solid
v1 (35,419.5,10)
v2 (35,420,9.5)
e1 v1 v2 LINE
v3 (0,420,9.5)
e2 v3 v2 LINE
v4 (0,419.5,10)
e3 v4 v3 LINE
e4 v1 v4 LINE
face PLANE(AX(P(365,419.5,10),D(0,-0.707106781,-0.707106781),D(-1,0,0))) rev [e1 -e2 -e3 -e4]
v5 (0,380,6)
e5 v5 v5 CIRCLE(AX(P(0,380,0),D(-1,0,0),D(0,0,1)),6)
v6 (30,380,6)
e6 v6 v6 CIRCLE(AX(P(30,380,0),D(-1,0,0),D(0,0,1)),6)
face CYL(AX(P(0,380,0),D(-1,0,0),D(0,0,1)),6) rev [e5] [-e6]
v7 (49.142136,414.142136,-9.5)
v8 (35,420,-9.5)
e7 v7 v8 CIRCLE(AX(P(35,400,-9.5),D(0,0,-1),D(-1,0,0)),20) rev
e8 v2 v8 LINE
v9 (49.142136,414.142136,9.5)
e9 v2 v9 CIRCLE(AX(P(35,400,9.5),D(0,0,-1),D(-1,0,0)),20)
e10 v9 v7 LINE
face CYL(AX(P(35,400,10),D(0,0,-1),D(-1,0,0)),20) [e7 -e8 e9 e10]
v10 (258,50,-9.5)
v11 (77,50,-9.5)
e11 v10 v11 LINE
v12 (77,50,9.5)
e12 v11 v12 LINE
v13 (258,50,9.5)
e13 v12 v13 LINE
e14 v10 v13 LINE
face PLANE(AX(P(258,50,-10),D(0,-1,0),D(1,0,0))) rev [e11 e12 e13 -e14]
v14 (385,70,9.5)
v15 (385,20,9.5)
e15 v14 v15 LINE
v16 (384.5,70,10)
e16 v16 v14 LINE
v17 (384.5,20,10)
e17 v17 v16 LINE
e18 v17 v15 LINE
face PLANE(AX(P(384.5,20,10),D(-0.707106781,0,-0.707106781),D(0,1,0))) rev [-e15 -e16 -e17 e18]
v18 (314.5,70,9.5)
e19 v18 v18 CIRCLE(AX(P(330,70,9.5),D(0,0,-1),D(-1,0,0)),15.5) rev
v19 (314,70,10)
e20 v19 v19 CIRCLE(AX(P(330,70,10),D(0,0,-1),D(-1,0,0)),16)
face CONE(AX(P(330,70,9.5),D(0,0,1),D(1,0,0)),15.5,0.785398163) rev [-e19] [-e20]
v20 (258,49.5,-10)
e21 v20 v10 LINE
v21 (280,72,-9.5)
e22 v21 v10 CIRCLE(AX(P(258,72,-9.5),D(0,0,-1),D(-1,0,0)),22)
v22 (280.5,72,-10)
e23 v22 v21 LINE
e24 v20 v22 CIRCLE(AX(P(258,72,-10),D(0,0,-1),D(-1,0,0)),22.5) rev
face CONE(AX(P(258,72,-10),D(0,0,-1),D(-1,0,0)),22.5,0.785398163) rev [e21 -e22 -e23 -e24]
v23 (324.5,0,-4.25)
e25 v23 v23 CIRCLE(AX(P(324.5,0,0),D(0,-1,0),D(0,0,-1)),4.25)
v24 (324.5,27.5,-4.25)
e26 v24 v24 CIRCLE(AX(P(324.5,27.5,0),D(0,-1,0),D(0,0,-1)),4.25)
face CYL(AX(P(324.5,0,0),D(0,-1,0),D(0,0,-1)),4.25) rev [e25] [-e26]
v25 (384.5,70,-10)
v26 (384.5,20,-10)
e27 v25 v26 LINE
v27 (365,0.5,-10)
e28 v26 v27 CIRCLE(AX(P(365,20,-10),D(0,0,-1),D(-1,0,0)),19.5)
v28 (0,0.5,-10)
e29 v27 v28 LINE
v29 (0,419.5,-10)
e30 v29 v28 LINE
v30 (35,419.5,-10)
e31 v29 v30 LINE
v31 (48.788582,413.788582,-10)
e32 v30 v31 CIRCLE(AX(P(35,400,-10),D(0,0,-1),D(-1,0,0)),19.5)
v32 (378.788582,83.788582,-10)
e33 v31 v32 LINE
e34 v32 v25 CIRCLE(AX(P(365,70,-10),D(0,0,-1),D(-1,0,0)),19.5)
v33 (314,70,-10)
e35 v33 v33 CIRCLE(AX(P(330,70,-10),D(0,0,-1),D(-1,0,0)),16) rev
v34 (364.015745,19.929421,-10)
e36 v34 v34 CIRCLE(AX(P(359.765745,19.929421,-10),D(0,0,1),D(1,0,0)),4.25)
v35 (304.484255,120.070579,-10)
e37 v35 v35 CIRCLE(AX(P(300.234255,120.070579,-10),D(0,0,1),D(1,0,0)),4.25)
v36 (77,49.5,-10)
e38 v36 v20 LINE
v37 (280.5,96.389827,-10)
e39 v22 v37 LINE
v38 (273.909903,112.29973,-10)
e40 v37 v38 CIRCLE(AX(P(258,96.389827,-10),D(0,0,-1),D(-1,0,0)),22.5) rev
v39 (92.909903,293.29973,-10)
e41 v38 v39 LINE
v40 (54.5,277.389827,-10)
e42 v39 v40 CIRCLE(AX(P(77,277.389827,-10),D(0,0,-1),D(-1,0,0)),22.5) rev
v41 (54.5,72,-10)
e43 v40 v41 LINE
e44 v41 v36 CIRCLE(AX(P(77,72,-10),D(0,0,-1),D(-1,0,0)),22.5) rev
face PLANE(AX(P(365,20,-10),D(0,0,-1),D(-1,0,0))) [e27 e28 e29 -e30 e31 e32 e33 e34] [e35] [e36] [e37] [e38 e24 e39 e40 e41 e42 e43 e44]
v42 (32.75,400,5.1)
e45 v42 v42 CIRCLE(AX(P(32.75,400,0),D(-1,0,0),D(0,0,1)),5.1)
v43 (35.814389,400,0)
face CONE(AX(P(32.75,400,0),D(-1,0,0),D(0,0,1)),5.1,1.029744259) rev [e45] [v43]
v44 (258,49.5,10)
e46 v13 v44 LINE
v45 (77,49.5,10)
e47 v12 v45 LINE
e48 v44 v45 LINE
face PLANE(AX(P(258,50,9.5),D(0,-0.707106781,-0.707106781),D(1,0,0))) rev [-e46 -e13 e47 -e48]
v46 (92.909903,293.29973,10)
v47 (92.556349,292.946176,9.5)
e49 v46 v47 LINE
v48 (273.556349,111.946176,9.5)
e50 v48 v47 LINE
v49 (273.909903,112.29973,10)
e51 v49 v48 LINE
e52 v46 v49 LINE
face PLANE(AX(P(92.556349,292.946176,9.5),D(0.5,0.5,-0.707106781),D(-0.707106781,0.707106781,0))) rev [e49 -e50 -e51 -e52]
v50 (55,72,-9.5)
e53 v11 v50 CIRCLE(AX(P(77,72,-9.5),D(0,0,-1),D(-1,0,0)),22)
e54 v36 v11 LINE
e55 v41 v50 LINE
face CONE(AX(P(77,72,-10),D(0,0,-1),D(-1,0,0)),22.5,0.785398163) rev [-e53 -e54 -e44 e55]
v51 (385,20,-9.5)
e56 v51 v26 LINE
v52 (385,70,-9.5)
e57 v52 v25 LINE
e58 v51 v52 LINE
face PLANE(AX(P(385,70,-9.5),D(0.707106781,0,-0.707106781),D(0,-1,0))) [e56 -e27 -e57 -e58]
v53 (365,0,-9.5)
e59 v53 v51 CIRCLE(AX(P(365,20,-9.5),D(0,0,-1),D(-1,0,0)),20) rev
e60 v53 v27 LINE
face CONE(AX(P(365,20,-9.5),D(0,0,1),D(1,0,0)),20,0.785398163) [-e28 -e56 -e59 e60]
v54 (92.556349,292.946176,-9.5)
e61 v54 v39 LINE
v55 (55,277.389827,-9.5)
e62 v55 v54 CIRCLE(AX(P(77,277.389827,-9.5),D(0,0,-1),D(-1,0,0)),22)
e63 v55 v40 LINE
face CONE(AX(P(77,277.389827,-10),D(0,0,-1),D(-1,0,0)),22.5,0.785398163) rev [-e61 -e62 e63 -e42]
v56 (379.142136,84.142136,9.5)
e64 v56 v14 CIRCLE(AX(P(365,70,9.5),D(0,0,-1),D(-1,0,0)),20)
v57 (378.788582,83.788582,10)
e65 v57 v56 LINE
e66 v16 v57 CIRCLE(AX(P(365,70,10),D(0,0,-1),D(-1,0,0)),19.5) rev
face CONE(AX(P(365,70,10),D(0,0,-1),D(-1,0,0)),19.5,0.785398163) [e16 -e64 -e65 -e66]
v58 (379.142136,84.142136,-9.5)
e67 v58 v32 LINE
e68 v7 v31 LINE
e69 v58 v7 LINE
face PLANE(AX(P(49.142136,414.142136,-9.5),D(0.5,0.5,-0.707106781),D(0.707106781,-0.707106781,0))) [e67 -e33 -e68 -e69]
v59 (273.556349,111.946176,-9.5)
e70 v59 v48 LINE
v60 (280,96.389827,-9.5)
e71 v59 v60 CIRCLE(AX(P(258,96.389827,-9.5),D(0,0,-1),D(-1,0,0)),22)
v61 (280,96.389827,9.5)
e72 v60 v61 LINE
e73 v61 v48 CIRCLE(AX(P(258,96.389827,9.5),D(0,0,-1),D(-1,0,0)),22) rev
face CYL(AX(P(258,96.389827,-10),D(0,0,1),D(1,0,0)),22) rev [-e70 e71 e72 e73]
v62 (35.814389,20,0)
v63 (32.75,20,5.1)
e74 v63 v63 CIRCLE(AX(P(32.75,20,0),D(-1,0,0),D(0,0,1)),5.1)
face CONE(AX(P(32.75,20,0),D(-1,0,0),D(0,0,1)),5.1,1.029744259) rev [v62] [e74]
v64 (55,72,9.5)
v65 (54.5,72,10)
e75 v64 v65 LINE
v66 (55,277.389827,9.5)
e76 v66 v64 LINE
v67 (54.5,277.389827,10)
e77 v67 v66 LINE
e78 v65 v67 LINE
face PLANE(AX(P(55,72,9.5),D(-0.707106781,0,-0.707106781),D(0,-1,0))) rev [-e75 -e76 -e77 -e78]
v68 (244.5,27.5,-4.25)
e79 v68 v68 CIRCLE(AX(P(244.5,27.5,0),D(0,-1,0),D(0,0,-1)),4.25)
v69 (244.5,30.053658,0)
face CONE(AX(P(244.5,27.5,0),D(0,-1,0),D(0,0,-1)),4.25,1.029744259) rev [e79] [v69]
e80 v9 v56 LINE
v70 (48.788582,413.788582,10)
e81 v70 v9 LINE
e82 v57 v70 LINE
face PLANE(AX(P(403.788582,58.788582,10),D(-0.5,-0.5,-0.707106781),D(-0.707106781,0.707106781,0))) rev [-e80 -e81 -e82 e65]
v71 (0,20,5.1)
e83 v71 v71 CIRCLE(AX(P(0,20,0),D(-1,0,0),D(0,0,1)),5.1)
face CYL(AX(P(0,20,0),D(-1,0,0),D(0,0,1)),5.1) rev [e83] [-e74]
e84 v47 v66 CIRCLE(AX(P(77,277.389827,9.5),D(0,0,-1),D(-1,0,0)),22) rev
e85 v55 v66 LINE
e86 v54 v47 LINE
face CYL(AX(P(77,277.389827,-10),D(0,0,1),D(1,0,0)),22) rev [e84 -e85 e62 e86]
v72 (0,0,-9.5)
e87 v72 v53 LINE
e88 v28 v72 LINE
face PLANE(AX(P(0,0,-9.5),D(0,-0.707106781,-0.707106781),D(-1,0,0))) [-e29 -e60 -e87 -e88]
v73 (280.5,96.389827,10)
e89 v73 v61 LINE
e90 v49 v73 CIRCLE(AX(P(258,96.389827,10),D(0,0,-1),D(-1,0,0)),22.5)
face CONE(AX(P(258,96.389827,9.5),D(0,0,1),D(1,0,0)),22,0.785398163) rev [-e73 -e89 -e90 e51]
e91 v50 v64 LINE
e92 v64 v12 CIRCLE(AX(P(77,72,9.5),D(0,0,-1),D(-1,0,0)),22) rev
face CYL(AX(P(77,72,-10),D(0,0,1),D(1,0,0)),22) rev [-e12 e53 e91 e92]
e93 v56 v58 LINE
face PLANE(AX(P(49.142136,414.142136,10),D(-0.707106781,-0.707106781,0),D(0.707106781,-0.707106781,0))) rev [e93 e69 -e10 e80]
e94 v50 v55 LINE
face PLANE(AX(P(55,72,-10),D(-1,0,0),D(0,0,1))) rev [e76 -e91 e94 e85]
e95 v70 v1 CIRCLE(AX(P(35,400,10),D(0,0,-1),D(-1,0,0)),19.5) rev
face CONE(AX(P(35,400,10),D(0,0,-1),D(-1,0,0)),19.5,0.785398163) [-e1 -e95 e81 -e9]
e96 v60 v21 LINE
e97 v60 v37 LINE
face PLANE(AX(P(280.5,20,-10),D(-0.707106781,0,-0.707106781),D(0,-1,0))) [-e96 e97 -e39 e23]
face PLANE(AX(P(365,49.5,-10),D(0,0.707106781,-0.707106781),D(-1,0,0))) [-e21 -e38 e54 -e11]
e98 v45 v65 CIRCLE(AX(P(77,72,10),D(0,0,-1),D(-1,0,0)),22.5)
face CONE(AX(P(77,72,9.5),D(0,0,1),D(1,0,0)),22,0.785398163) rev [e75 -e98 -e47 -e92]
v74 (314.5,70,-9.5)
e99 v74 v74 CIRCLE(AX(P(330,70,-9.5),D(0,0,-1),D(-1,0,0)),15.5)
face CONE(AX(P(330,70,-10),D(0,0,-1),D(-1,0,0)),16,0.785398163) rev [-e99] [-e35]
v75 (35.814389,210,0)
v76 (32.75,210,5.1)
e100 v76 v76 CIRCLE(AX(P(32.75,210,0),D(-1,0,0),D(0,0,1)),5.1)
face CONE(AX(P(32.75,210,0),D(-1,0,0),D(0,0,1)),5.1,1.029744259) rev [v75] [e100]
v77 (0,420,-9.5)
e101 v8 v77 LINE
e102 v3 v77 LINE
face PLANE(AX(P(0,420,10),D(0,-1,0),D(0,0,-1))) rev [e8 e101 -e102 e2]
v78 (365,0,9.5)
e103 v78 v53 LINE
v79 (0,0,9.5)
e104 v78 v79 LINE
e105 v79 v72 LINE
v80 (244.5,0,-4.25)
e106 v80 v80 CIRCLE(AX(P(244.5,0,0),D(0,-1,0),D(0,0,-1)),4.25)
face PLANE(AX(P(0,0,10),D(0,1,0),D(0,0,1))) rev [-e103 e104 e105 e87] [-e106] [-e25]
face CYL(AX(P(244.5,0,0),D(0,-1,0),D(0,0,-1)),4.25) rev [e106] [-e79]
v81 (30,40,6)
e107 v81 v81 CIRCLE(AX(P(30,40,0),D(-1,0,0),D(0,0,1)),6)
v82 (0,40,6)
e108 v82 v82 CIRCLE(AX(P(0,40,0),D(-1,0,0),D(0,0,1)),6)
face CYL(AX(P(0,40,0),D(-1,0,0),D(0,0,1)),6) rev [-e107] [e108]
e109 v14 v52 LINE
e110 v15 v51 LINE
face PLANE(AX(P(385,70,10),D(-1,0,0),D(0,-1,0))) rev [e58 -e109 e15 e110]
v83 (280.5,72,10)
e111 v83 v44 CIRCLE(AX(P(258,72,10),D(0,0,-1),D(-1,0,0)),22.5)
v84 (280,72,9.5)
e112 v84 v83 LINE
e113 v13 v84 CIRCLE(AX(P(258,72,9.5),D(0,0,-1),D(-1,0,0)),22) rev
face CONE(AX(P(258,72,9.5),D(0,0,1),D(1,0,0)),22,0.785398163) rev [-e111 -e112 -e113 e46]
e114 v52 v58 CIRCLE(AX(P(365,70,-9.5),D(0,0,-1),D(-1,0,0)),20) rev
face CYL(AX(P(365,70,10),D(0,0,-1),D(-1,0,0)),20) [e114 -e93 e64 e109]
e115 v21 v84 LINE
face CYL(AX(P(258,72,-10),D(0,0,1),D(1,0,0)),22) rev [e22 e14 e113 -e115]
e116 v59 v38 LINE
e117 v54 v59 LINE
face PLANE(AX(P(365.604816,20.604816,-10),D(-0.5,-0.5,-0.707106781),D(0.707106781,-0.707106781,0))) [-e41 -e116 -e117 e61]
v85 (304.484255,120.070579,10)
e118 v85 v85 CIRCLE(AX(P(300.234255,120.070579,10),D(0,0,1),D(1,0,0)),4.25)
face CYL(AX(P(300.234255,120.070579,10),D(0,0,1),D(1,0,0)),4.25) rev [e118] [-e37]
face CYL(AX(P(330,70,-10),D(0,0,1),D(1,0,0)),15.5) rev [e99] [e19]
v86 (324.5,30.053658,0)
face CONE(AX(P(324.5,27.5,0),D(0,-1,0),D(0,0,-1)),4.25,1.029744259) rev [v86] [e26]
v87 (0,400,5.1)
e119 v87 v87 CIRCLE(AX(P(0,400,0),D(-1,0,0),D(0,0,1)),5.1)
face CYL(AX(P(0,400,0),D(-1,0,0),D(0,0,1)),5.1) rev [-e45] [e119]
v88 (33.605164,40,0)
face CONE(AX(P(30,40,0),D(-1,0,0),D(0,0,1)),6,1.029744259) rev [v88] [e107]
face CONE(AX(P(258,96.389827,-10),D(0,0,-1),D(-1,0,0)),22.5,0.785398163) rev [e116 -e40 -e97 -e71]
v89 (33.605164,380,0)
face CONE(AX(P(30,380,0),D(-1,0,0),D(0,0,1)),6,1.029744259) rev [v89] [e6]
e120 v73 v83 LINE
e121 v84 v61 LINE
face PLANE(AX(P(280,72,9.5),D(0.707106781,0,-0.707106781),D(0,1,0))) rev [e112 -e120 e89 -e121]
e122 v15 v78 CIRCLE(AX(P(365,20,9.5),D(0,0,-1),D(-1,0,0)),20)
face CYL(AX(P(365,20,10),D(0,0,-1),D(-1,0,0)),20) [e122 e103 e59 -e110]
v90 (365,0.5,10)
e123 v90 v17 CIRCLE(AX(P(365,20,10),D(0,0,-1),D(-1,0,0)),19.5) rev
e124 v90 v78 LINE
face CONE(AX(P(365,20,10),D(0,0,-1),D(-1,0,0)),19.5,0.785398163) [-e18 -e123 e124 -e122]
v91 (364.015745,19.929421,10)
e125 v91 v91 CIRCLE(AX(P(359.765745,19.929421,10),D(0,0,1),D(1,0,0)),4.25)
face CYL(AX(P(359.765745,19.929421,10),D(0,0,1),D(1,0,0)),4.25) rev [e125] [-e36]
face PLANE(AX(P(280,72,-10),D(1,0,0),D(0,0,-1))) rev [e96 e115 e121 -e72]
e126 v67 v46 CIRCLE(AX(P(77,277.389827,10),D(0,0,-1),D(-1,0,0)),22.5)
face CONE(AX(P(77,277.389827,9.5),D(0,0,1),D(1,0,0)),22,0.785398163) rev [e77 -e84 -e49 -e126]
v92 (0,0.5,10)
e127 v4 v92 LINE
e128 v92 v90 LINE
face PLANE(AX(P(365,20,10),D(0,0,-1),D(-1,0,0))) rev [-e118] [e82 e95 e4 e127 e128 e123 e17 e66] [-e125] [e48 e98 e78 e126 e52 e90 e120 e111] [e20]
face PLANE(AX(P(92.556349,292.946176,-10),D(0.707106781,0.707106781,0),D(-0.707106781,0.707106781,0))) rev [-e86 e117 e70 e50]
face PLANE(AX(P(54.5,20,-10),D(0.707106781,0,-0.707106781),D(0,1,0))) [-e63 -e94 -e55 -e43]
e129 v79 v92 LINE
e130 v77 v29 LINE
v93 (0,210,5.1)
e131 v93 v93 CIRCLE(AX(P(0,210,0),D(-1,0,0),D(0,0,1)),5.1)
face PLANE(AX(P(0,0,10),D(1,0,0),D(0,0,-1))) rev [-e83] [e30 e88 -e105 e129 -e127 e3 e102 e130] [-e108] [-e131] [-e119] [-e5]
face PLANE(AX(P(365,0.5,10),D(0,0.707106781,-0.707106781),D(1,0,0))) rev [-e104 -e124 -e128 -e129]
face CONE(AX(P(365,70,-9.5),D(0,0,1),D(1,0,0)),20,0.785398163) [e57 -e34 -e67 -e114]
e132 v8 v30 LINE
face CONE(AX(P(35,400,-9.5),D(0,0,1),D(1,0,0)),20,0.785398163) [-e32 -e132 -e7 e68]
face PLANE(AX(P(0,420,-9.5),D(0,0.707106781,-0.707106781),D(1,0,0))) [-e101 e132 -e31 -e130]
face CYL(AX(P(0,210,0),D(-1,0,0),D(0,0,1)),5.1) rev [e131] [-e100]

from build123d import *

# Parameters (mm, degrees)
AUFSATZ_LINEAR_AUSTRAGEN1_DEPTH      = 10
F_12_0_12_DURCHMESSER_BOHRUNG1_D     = 12
F_12_0_12_DURCHMESSER_BOHRUNG1_DEPTH = 30
F_12_0_12_DURCHMESSER_BOHRUNG1_TIP   = 3.605163714
M12_GEWINDEBOHRUNG1_D                = 10.2
M12_GEWINDEBOHRUNG1_DEPTH            = 32.75
M12_GEWINDEBOHRUNG1_TIP              = 3.064389157
SCHNITT_LINEAR_START                 = -10
SCHNITT_LINEAR_AUSTRAGEN1_OUTLINE_R  = 15.5
SCHNITT_LINEAR_AUSTRAGEN1_DEPTH      = 20
M10_START                            = -10
M10_GEWINDEBOHRUNG1_OUTLINE_R        = 4.25
M10_GEWINDEBOHRUNG1_DEPTH            = 20
M10_GEWINDEBOHRUNG2_D                = 8.5
M10_GEWINDEBOHRUNG2_DEPTH            = 27.5
M10_GEWINDEBOHRUNG2_TIP              = 2.553657631
FASE1_SIZE                           = 0.5


# Read off the part's stored shape, not the designer's step: Schnitt-Linear austragen1, M10 Gewindebohrung1
with BuildPart() as part:
    # Skizze1 → Aufsatz-Linear austragen1 (new, symmetric)
    with BuildSketch(Plane.XY):
        with BuildLine():
            Line((0, 0), (0, 420))
            Line((0, 420), (35, 420))
            ThreePointArc((35, 420), (42.653668647, 418.47759065), (49.142135624, 414.142135624))
            Line((49.142135624, 414.142135624), (379.142135624, 84.142135624))
            ThreePointArc((379.142135624, 84.142135624), (383.47759065, 77.653668647), (385, 70))
            Line((385, 70), (385, 20))
            ThreePointArc((385, 20), (379.142135624, 5.857864376), (365, 0))
            Line((365, 0), (0, 0))
        make_face()
    extrude(amount=AUFSATZ_LINEAR_AUSTRAGEN1_DEPTH, both=True)

    # Ø12.0 (12) Durchmesser Bohrung1
    with Locations(Plane.ZY):
        with Locations((0, 40), (0, 380)):
            Hole(F_12_0_12_DURCHMESSER_BOHRUNG1_D / 2, depth=F_12_0_12_DURCHMESSER_BOHRUNG1_DEPTH)
            with Locations((0, 0, -(F_12_0_12_DURCHMESSER_BOHRUNG1_DEPTH + F_12_0_12_DURCHMESSER_BOHRUNG1_TIP / 2))):  # 118° drill point
                Cone(0, F_12_0_12_DURCHMESSER_BOHRUNG1_D / 2, F_12_0_12_DURCHMESSER_BOHRUNG1_TIP, mode=Mode.SUBTRACT)

    # M12 Gewindebohrung1
    with Locations(Plane.ZY):
        with Locations((0, 20), (0, 210), (0, 400)):
            Hole(M12_GEWINDEBOHRUNG1_D / 2, depth=M12_GEWINDEBOHRUNG1_DEPTH)
            with Locations((0, 0, -(M12_GEWINDEBOHRUNG1_DEPTH + M12_GEWINDEBOHRUNG1_TIP / 2))):  # 118° drill point
                Cone(0, M12_GEWINDEBOHRUNG1_D / 2, M12_GEWINDEBOHRUNG1_TIP, mode=Mode.SUBTRACT)

    # Schnitt-Linear austragen1 outline → Schnitt-Linear austragen1 (cut)
    with BuildSketch(Plane.XY.offset(SCHNITT_LINEAR_START)):
        with BuildLine():
            Line((55, 277.389826945), (55, 72))
            ThreePointArc((55, 72), (61.443650814, 56.443650814), (77, 50))
            Line((77, 50), (258, 50))
            ThreePointArc((258, 50), (273.556349186, 56.443650814), (280, 72))
            Line((280, 72), (280, 96.389826945))
            ThreePointArc((280, 96.389826945), (278.325349715, 104.808862457), (273.556349186, 111.946176131))
            Line((273.556349186, 111.946176131), (92.556349186, 292.946176131))
            ThreePointArc((92.556349186, 292.946176131), (68.580964488, 297.71517666), (55, 277.389826945))
        make_face()
        with Locations((330, 70)):
            Circle(SCHNITT_LINEAR_AUSTRAGEN1_OUTLINE_R)
    extrude(amount=SCHNITT_LINEAR_AUSTRAGEN1_DEPTH, mode=Mode.SUBTRACT)

    # M10 Gewindebohrung1 outline → M10 Gewindebohrung1 (cut)
    with BuildSketch(Plane.XY.offset(M10_START)):
        with Locations((300.234254829, 120.07057933)):
            Circle(M10_GEWINDEBOHRUNG1_OUTLINE_R)
        with Locations((359.765745171, 19.92942067)):
            Circle(M10_GEWINDEBOHRUNG1_OUTLINE_R)
    extrude(amount=M10_GEWINDEBOHRUNG1_DEPTH, mode=Mode.SUBTRACT)

    # M10 Gewindebohrung2
    with Locations(Plane(origin=(0, 0, 0), x_dir=(-1, 0, 0), z_dir=(0, -1, 0))):
        with Locations((-324.5, 0), (-244.5, 0)):
            Hole(M10_GEWINDEBOHRUNG2_D / 2, depth=M10_GEWINDEBOHRUNG2_DEPTH)
            with Locations((0, 0, -(M10_GEWINDEBOHRUNG2_DEPTH + M10_GEWINDEBOHRUNG2_TIP / 2))):  # 118° drill point
                Cone(0, M10_GEWINDEBOHRUNG2_D / 2, M10_GEWINDEBOHRUNG2_TIP, mode=Mode.SUBTRACT)

    # Fase1
    fase1_edges = [part.edges().sort_by_distance(p)[0] for p in [
        (385, 45, 10),
        (379.142135624, 5.857864376, -10),
        (182.5, 0, -10),
        (383.47759065, 77.653668647, 10),
        (214.142135624, 249.142135624, 10),
        (42.653668647, 418.47759065, 10),
        (17.5, 420, 10),
        (182.5, 0, 10),
        (61.443650814, 56.443650814, -10),
        (55, 174.694913472, -10),
        (68.580964488, 297.71517666, -10),
        (183.056349186, 202.446176131, -10),
        (278.325349715, 104.808862457, -10),
        (280, 84.194913472, -10),
        (273.556349186, 56.443650814, -10),
        (167.5, 50, -10),
        (61.443650814, 56.443650814, 10),
        (167.5, 50, 10),
        (273.556349186, 56.443650814, 10),
        (280, 84.194913472, 10),
        (278.325349715, 104.808862457, 10),
        (183.056349186, 202.446176131, 10),
        (68.580964488, 297.71517666, 10),
        (55, 174.694913472, 10),
        (379.142135624, 5.857864376, 10),
        (314.5, 70, -10),
        (314.5, 70, 10),
        (17.5, 420, -10),
        (42.653668647, 418.47759065, -10),
        (214.142135624, 249.142135624, -10),
        (383.47759065, 77.653668647, -10),
        (385, 45, -10),
    ]]
    chamfer(fase1_edges, length=FASE1_SIZE)


solid = part.part
